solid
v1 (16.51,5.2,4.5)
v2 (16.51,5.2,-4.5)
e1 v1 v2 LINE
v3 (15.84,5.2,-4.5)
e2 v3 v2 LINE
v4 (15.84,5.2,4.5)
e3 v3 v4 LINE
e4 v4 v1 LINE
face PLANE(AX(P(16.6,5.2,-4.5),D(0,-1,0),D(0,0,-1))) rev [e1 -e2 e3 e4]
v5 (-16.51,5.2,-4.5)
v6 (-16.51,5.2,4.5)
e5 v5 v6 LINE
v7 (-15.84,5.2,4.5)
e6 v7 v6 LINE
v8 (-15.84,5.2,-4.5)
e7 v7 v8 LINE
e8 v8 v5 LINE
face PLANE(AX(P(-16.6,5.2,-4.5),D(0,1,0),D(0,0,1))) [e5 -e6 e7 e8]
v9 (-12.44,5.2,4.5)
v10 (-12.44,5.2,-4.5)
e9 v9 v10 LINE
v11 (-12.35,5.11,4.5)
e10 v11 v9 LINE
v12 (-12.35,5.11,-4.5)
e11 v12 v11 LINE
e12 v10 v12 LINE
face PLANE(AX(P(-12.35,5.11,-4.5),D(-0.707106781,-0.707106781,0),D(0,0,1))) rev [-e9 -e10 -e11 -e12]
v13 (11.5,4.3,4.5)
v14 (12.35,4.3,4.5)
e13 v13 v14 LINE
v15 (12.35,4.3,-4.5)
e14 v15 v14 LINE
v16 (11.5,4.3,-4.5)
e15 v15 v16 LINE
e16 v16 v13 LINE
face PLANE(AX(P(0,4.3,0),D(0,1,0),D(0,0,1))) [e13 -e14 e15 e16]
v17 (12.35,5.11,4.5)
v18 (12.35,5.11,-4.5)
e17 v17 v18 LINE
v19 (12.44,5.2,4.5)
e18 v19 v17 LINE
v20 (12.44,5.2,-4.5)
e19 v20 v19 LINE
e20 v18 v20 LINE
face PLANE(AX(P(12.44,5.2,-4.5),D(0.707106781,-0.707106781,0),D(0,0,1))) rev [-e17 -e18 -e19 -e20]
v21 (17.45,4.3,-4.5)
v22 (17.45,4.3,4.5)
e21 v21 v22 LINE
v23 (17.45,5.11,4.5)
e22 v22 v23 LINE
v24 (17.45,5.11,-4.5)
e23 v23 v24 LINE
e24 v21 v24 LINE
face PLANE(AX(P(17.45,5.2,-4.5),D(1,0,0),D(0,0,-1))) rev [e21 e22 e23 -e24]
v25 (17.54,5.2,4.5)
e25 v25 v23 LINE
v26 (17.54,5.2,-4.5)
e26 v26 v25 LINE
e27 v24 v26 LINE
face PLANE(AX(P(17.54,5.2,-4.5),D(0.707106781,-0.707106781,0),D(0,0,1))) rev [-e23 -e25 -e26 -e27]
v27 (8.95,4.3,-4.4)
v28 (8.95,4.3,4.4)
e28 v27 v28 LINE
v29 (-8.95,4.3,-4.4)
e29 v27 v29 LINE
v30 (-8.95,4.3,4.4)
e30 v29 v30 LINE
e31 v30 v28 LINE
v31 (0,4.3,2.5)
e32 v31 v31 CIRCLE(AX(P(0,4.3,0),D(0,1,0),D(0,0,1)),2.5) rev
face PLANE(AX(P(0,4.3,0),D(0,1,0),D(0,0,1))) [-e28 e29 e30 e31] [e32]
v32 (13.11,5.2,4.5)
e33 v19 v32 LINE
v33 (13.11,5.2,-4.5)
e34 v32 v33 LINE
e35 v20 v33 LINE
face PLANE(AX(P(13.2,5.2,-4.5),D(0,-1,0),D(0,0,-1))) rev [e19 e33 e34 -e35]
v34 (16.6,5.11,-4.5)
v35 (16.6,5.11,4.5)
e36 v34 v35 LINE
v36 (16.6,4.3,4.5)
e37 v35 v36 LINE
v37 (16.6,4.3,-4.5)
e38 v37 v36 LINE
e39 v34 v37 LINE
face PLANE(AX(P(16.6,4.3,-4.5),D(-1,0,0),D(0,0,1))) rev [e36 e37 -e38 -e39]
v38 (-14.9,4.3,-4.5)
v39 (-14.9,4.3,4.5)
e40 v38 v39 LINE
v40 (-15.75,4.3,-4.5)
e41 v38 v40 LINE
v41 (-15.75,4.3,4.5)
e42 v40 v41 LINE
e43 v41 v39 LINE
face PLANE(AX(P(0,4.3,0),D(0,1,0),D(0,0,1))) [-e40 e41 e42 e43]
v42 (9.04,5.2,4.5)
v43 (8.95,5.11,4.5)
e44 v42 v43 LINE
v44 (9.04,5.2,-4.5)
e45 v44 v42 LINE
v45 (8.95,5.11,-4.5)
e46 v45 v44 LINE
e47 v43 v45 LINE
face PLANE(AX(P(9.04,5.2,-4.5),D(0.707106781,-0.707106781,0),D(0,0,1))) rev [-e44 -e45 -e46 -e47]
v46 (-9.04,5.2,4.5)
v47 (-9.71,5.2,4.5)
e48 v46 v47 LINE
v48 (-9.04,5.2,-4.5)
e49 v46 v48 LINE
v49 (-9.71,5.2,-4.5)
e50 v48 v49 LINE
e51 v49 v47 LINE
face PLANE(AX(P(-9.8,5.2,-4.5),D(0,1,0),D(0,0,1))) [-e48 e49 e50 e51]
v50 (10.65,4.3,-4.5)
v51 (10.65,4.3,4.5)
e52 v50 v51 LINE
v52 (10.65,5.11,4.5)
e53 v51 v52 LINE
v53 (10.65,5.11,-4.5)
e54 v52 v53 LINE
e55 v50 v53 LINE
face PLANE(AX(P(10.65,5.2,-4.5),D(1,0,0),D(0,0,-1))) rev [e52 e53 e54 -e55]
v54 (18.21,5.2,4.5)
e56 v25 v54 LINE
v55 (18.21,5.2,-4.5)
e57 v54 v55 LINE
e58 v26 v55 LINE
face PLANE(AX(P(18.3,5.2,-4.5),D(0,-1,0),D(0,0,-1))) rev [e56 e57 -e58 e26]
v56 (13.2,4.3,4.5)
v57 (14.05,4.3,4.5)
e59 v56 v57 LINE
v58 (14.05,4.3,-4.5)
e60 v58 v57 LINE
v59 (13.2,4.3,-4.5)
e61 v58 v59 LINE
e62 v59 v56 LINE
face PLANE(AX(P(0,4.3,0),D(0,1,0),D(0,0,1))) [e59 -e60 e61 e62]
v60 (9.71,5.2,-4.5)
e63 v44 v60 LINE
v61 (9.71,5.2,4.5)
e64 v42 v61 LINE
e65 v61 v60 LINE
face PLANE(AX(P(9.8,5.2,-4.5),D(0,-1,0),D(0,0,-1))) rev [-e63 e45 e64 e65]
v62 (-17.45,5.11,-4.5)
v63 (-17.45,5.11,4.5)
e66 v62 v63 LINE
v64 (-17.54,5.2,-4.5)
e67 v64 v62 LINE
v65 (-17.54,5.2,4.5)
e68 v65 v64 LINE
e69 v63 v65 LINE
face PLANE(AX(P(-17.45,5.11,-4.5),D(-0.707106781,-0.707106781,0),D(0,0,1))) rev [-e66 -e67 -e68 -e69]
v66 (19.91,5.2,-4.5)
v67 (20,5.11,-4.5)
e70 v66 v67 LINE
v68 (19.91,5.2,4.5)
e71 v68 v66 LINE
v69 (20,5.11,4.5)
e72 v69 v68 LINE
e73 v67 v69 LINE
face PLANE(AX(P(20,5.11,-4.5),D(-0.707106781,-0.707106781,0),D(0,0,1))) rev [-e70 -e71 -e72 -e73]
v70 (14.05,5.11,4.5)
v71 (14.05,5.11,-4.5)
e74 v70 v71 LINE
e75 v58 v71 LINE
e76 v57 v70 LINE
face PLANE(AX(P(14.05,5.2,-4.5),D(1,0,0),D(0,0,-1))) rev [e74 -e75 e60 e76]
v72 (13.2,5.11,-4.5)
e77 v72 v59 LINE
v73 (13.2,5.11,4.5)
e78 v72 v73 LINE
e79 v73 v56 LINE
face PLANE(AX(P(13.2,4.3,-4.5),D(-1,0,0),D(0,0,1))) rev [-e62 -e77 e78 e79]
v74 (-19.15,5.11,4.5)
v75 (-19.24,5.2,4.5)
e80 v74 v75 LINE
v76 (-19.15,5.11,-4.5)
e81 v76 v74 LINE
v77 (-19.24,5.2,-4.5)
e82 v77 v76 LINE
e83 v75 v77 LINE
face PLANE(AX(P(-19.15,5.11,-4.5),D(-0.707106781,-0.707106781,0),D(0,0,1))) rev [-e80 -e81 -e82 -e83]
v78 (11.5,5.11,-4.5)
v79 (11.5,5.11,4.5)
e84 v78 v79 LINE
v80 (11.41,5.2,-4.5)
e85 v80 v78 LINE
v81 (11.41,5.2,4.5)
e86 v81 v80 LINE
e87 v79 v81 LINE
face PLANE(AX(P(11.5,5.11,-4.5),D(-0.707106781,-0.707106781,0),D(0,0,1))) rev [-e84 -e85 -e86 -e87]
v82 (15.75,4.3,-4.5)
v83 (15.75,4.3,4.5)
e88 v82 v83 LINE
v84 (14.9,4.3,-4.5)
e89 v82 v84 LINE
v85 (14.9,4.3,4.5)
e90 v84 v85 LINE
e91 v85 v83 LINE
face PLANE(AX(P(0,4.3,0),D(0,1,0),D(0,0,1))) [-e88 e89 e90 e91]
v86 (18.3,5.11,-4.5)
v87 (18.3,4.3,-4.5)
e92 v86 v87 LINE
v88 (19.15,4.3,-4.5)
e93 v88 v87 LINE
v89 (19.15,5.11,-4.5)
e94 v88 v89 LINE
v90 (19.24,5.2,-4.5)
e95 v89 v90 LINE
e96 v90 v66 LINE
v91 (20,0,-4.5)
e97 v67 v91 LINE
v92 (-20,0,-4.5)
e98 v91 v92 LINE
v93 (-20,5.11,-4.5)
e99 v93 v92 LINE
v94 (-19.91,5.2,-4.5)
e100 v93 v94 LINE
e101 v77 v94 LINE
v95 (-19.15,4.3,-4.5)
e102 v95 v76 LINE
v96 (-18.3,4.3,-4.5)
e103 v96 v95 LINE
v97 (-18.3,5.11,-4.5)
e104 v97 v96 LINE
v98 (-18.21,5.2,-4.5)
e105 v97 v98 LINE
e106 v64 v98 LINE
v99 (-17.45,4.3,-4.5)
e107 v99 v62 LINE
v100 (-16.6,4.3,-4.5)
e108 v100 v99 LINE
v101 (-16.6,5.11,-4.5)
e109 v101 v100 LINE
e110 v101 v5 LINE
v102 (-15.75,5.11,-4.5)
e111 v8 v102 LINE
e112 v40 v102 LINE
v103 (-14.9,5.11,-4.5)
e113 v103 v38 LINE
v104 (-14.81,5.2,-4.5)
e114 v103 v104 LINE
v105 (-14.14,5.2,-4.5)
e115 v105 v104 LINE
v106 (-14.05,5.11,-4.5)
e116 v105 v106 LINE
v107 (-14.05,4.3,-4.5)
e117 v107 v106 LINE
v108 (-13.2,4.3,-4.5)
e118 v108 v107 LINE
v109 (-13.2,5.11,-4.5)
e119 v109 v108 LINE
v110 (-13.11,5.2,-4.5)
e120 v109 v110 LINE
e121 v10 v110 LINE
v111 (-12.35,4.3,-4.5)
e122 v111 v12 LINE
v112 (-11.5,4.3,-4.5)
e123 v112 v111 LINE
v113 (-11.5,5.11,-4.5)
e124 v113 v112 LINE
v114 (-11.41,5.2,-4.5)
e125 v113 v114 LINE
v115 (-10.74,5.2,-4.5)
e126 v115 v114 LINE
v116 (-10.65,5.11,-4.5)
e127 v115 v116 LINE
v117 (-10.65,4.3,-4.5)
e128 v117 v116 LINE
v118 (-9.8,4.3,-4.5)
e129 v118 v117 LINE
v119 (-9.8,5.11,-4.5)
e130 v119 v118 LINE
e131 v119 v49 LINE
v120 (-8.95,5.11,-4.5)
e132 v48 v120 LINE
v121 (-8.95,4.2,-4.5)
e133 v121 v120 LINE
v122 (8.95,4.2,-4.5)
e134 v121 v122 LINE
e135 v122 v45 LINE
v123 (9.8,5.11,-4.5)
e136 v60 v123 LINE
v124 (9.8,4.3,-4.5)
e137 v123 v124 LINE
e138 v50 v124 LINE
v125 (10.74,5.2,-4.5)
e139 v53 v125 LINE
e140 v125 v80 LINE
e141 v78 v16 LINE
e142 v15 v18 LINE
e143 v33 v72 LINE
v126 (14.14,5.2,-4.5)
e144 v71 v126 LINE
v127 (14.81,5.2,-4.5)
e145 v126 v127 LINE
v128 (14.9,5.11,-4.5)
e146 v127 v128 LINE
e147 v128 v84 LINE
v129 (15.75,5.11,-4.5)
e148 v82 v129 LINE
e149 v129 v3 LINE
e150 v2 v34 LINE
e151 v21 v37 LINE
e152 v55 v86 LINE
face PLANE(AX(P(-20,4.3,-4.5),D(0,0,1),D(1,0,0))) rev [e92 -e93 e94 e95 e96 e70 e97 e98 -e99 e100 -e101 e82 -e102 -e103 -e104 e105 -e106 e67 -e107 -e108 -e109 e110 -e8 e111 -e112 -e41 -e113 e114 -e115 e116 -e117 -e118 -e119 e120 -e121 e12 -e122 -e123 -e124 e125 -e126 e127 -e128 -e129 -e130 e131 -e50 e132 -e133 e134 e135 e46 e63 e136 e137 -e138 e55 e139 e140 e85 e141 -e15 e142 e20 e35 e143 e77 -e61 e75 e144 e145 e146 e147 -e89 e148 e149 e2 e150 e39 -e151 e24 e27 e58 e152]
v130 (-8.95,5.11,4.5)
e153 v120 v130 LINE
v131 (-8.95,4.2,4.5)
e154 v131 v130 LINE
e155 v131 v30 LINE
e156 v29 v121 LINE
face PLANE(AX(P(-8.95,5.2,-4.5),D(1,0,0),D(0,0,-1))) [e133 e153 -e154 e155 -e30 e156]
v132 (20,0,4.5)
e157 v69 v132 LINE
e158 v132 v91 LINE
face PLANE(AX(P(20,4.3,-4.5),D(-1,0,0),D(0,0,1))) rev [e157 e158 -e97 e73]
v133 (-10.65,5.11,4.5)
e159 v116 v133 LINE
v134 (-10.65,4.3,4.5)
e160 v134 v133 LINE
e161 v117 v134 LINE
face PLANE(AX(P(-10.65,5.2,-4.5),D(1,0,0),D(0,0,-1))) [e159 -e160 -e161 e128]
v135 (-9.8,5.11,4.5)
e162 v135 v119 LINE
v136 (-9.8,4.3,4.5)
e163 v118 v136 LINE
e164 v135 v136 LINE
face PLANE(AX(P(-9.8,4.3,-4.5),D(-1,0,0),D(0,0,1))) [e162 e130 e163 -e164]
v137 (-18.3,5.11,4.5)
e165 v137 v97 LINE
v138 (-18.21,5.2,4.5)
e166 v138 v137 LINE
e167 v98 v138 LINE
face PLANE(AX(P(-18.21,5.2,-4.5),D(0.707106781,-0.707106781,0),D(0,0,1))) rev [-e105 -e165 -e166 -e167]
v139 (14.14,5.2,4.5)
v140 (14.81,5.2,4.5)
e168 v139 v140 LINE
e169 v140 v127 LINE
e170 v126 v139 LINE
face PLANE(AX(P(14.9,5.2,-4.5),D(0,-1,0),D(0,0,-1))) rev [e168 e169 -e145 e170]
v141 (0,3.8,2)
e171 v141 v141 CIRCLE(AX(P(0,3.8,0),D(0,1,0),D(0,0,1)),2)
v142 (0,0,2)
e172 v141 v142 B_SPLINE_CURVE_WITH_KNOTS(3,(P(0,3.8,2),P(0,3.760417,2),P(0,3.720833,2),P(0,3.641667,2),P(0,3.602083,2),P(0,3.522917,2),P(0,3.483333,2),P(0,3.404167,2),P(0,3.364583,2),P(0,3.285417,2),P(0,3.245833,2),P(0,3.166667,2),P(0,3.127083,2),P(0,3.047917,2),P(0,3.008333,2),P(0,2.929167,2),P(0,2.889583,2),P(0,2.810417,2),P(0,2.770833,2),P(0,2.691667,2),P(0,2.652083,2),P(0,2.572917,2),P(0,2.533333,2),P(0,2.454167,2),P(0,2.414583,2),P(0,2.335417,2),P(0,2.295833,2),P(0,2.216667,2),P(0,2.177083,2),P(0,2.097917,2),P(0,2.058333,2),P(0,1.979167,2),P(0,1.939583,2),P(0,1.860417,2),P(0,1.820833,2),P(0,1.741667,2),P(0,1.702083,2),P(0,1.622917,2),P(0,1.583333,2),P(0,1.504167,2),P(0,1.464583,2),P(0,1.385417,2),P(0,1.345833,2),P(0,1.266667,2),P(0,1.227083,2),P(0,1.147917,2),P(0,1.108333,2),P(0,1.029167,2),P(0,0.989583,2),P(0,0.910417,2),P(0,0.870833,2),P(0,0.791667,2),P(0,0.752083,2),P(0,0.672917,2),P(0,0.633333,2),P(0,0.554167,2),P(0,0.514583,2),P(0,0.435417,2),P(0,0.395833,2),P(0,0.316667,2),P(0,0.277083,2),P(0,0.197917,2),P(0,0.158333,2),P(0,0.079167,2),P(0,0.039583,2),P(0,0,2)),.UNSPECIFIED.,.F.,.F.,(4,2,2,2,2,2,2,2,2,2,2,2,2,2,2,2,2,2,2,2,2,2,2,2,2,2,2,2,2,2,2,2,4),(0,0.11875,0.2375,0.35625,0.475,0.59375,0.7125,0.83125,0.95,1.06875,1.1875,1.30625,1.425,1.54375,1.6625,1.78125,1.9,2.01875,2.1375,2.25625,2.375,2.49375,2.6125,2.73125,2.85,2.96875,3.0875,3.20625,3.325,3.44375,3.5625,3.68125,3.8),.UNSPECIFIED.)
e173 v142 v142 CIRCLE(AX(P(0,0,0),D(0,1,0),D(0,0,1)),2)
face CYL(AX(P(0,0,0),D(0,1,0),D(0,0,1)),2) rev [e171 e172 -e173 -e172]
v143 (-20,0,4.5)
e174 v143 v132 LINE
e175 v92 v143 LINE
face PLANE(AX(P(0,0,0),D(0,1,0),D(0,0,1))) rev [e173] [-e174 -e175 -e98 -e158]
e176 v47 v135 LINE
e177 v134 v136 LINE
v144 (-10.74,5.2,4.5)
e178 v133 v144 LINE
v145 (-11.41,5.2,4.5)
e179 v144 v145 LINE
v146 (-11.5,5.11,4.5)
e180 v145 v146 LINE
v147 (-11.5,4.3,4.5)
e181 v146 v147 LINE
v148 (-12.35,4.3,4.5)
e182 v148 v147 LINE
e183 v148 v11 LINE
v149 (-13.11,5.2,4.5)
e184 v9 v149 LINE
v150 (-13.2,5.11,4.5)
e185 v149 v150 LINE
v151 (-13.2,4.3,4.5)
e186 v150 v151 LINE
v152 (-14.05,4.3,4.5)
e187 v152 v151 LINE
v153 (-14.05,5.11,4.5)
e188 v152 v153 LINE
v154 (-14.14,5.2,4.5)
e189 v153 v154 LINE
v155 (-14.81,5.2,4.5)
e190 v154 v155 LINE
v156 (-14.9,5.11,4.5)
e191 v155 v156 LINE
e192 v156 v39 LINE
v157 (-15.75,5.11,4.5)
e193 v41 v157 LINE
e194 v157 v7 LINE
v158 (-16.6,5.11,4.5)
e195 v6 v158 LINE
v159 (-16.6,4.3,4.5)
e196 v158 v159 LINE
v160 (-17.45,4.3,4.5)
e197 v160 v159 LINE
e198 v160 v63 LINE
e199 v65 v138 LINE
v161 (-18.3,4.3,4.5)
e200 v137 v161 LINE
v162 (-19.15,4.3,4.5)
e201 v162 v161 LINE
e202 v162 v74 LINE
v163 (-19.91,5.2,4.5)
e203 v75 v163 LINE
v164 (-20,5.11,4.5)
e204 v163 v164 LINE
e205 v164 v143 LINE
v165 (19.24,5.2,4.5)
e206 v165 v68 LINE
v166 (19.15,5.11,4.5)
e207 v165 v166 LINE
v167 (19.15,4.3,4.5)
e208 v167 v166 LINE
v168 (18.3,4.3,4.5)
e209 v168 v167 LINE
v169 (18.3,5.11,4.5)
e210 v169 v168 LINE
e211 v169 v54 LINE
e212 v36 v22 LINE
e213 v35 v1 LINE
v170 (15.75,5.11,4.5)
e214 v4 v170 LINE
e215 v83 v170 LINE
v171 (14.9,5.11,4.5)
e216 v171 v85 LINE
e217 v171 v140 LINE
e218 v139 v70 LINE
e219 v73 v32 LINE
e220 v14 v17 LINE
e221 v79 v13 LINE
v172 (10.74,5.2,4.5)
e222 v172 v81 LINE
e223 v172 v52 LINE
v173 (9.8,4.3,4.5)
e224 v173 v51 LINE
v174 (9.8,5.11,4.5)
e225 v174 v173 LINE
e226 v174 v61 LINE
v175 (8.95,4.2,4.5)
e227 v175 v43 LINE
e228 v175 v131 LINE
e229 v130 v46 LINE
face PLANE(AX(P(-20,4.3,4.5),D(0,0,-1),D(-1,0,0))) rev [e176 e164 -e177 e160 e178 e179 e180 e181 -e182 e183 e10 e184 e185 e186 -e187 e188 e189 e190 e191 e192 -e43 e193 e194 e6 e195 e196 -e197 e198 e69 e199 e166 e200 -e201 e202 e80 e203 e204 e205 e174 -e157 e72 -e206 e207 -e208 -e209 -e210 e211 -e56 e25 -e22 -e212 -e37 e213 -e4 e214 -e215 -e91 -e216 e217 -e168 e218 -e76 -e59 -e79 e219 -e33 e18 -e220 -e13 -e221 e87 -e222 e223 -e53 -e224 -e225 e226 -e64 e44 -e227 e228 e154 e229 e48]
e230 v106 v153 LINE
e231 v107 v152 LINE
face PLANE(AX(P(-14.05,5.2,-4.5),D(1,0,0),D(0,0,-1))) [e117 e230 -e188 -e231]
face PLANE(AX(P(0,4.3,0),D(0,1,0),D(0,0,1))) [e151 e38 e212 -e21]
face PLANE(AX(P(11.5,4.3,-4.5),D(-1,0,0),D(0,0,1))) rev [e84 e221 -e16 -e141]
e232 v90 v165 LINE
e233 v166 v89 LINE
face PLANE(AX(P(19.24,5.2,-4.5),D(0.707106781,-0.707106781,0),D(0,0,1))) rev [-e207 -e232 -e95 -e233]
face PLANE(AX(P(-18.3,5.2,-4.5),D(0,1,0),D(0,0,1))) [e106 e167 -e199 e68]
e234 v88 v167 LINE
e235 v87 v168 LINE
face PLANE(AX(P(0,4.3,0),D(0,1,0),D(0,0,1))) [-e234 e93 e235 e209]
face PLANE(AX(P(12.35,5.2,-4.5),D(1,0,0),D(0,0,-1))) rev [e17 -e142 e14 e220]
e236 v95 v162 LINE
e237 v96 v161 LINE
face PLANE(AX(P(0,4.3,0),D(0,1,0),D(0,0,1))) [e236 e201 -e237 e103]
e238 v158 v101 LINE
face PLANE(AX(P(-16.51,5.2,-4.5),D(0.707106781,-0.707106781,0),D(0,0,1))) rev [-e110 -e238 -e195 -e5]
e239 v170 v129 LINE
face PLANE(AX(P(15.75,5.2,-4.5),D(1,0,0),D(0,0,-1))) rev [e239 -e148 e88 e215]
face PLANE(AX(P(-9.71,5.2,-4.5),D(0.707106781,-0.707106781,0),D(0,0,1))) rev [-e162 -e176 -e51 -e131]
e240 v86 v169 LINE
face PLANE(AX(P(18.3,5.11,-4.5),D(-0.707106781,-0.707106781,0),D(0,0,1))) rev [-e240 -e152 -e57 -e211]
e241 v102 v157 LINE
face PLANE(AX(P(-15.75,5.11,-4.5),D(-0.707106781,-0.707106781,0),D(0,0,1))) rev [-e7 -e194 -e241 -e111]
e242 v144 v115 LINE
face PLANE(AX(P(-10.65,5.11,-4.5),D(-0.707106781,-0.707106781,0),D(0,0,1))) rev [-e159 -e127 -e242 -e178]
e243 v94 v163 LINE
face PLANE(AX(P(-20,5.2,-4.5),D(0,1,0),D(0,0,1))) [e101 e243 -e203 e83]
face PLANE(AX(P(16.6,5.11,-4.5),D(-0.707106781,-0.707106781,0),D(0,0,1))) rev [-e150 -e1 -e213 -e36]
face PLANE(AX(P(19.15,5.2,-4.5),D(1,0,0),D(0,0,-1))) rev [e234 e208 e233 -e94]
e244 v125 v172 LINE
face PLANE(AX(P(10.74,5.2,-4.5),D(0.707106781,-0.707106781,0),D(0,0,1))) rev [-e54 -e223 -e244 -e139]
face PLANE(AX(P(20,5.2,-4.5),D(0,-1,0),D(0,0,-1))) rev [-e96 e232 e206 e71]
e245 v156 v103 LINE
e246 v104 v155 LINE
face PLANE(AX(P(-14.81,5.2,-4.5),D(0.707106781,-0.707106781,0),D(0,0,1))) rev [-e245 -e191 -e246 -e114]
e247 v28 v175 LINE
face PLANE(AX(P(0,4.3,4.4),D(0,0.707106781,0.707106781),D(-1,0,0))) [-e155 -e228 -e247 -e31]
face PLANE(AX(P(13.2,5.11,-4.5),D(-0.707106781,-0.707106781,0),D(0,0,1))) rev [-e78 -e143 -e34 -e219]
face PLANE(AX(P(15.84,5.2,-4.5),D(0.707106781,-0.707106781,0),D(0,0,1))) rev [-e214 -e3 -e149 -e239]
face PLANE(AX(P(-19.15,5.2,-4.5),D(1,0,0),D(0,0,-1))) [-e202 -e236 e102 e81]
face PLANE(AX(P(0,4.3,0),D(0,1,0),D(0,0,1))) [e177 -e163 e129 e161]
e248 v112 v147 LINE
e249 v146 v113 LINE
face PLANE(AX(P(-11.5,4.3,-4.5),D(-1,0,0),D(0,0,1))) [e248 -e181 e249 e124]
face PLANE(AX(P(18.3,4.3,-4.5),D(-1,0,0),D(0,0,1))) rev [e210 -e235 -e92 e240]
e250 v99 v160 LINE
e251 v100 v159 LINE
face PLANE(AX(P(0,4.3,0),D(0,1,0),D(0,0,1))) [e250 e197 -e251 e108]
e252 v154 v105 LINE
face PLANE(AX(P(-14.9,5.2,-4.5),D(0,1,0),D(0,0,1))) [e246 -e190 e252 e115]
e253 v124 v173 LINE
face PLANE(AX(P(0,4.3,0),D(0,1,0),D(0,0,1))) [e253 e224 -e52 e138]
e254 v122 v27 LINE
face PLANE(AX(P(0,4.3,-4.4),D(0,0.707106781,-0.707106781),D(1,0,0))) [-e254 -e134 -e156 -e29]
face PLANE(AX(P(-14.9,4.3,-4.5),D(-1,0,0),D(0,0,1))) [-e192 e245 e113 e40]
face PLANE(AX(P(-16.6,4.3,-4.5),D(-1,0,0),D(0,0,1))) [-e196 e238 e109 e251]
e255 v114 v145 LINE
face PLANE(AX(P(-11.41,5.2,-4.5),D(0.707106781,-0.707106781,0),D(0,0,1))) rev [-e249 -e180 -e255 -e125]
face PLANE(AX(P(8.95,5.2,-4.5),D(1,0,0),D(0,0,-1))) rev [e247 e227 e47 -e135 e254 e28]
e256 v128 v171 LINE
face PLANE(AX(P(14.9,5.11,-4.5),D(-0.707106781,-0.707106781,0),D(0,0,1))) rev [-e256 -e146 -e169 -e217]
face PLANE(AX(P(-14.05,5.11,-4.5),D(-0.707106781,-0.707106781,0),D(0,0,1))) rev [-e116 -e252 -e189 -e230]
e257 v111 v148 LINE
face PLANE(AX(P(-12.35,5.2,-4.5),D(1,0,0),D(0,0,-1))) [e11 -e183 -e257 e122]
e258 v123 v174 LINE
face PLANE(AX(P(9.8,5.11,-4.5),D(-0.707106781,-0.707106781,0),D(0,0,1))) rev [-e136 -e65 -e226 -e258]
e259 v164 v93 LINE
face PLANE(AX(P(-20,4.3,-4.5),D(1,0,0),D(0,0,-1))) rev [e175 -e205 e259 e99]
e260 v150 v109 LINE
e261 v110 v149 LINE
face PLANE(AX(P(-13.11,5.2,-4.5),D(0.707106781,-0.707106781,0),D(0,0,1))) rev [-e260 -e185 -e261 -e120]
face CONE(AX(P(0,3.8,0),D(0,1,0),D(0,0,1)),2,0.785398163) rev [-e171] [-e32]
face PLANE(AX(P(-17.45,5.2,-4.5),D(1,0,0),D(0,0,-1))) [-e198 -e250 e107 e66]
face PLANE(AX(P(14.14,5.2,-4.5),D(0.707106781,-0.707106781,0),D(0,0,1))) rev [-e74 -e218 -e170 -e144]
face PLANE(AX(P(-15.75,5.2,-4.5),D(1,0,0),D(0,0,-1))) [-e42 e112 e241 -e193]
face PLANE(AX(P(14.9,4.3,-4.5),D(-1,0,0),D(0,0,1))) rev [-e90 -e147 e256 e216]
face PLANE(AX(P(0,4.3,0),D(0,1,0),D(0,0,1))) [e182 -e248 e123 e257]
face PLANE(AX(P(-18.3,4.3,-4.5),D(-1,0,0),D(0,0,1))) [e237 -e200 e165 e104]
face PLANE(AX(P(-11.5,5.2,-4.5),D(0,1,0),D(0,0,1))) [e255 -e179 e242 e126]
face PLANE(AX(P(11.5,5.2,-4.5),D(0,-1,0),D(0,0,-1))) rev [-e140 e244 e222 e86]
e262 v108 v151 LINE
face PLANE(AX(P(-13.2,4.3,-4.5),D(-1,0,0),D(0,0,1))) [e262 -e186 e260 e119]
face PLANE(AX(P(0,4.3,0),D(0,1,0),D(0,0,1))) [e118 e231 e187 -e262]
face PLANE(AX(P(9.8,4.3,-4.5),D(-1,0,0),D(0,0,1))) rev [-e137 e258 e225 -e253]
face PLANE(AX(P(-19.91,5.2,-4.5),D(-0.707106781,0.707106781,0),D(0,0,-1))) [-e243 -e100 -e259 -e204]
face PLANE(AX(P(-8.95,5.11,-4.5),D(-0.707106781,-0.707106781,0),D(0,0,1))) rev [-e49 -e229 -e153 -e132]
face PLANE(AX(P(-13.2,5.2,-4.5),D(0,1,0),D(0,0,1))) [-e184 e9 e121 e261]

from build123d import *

# Parameters (mm, degrees)
SKETCH_1_W                          = 40
SKETCH_1_H                          = 9
EXTRUDE_1_DEPTH                     = 4.3
SKETCH_2_W                          = 0.85
SKETCH_2_H                          = 0.9
EXTRUDE_2_DEPTH                     = 9
CHAMFER_1_SIZE                      = 0.09
PATTERN_LINEAR_10_COUNT             = 7
PATTERN_LINEAR_10_PITCH             = 1.7
CHAMFER_1_OF_PATTERN_LINEAR_10_SIZE = 0.09
MIRROR_START                        = -4.5
MIRROR_3_DEPTH                      = 9
SKETCH_4_R                          = 2
CUT_EXTRUDE_1_DEPTH                 = 21.946121359
CHAMFER_2_SIZE                      = 0.5
CHAMFER_3_SIZE                      = 0.1


# Read off the part's stored shape, not the designer's step: 鏡射3
with BuildPart() as part:
    # 草圖1 → 填料-伸長1 (new body)
    with BuildSketch(Plane(origin=(0, 0, 0), x_dir=(1, 0, 0), z_dir=(0, 1, 0))):
        Rectangle(SKETCH_1_W, SKETCH_1_H)
    extrude(amount=EXTRUDE_1_DEPTH)

    # 草圖2 → 填料-伸長2 (add)
    with BuildSketch(Plane.XY.offset(4.5)):
        with Locations((-19.575, 4.75)):
            Rectangle(SKETCH_2_W, SKETCH_2_H)
    extrude_2 = extrude(amount=-EXTRUDE_2_DEPTH)

    # 導角1
    chamfer_1_edges = [part.edges().sort_by_distance(p)[0] for p in [
        (-20, 5.2, 0),
        (-19.15, 5.2, 0),
    ]]
    chamfer(chamfer_1_edges, length=CHAMFER_1_SIZE)

    # 直線複製排列10: 填料-伸長2 ×7
    with Locations(*[(i * PATTERN_LINEAR_10_PITCH, 0, 0) for i in range(1, PATTERN_LINEAR_10_COUNT)]):
        add(extrude_2)

    # 導角1 of 直線複製排列10
    chamfer_1_of_pattern_linear_10_edges = [part.edges().sort_by_distance(p)[0] for p in [
        (-18.3, 5.2, 0),
        (-17.45, 5.2, 0),
        (-16.6, 5.2, 0),
        (-15.75, 5.2, 0),
        (-14.9, 5.2, 0),
        (-14.05, 5.2, 0),
        (-13.2, 5.2, 0),
        (-12.35, 5.2, 0),
        (-11.5, 5.2, 0),
        (-10.65, 5.2, 0),
        (-9.8, 5.2, 0),
        (-8.95, 5.2, 0),
    ]]
    chamfer(chamfer_1_of_pattern_linear_10_edges, length=CHAMFER_1_OF_PATTERN_LINEAR_10_SIZE)

    # 鏡射3 outline → 鏡射3 (add)
    with BuildSketch(Plane.XY.offset(MIRROR_START)):
        Polygon((8.95, 4.3), (9.8, 4.3), (9.8, 5.11), (9.71, 5.2), (9.04, 5.2), (8.95, 5.11), align=None)
        Polygon((10.65, 4.3), (11.5, 4.3), (11.5, 5.11), (11.41, 5.2), (10.74, 5.2), (10.65, 5.11), align=None)
        Polygon((12.35, 4.3), (13.2, 4.3), (13.2, 5.11), (13.11, 5.2), (12.44, 5.2), (12.35, 5.11), align=None)
        Polygon((14.05, 4.3), (14.9, 4.3), (14.9, 5.11), (14.81, 5.2), (14.14, 5.2), (14.05, 5.11), align=None)
        Polygon((15.75, 4.3), (16.6, 4.3), (16.6, 5.11), (16.51, 5.2), (15.84, 5.2), (15.75, 5.11), align=None)
        Polygon((17.45, 4.3), (18.3, 4.3), (18.3, 5.11), (18.21, 5.2), (17.54, 5.2), (17.45, 5.11), align=None)
        Polygon((20, 4.3), (20, 5.11), (19.91, 5.2), (19.24, 5.2), (19.15, 5.11), (19.15, 4.3), align=None)
    extrude(amount=MIRROR_3_DEPTH)

    # 草圖4 → 除料-伸長1 (cut, through all)
    with BuildSketch(Plane(origin=(0, 4.3, 0), x_dir=(1, 0, 0), z_dir=(0, 1, 0))):
        with Locations(Location((0, 0, 0), (0, 0, 270))):
            Circle(SKETCH_4_R)
    extrude(amount=-CUT_EXTRUDE_1_DEPTH, mode=Mode.SUBTRACT)

    # 導角2
    chamfer_2_edges = [part.edges().sort_by_distance(p)[0] for p in [
        (0, 4.3, -2),
    ]]
    chamfer(chamfer_2_edges, length=CHAMFER_2_SIZE)

    # 導角3
    chamfer_3_edges = [part.edges().sort_by_distance(p)[0] for p in [
        (0, 4.3, -4.5),
        (0, 4.3, 4.5),
    ]]
    chamfer(chamfer_3_edges, length=CHAMFER_3_SIZE)


solid = part.part
